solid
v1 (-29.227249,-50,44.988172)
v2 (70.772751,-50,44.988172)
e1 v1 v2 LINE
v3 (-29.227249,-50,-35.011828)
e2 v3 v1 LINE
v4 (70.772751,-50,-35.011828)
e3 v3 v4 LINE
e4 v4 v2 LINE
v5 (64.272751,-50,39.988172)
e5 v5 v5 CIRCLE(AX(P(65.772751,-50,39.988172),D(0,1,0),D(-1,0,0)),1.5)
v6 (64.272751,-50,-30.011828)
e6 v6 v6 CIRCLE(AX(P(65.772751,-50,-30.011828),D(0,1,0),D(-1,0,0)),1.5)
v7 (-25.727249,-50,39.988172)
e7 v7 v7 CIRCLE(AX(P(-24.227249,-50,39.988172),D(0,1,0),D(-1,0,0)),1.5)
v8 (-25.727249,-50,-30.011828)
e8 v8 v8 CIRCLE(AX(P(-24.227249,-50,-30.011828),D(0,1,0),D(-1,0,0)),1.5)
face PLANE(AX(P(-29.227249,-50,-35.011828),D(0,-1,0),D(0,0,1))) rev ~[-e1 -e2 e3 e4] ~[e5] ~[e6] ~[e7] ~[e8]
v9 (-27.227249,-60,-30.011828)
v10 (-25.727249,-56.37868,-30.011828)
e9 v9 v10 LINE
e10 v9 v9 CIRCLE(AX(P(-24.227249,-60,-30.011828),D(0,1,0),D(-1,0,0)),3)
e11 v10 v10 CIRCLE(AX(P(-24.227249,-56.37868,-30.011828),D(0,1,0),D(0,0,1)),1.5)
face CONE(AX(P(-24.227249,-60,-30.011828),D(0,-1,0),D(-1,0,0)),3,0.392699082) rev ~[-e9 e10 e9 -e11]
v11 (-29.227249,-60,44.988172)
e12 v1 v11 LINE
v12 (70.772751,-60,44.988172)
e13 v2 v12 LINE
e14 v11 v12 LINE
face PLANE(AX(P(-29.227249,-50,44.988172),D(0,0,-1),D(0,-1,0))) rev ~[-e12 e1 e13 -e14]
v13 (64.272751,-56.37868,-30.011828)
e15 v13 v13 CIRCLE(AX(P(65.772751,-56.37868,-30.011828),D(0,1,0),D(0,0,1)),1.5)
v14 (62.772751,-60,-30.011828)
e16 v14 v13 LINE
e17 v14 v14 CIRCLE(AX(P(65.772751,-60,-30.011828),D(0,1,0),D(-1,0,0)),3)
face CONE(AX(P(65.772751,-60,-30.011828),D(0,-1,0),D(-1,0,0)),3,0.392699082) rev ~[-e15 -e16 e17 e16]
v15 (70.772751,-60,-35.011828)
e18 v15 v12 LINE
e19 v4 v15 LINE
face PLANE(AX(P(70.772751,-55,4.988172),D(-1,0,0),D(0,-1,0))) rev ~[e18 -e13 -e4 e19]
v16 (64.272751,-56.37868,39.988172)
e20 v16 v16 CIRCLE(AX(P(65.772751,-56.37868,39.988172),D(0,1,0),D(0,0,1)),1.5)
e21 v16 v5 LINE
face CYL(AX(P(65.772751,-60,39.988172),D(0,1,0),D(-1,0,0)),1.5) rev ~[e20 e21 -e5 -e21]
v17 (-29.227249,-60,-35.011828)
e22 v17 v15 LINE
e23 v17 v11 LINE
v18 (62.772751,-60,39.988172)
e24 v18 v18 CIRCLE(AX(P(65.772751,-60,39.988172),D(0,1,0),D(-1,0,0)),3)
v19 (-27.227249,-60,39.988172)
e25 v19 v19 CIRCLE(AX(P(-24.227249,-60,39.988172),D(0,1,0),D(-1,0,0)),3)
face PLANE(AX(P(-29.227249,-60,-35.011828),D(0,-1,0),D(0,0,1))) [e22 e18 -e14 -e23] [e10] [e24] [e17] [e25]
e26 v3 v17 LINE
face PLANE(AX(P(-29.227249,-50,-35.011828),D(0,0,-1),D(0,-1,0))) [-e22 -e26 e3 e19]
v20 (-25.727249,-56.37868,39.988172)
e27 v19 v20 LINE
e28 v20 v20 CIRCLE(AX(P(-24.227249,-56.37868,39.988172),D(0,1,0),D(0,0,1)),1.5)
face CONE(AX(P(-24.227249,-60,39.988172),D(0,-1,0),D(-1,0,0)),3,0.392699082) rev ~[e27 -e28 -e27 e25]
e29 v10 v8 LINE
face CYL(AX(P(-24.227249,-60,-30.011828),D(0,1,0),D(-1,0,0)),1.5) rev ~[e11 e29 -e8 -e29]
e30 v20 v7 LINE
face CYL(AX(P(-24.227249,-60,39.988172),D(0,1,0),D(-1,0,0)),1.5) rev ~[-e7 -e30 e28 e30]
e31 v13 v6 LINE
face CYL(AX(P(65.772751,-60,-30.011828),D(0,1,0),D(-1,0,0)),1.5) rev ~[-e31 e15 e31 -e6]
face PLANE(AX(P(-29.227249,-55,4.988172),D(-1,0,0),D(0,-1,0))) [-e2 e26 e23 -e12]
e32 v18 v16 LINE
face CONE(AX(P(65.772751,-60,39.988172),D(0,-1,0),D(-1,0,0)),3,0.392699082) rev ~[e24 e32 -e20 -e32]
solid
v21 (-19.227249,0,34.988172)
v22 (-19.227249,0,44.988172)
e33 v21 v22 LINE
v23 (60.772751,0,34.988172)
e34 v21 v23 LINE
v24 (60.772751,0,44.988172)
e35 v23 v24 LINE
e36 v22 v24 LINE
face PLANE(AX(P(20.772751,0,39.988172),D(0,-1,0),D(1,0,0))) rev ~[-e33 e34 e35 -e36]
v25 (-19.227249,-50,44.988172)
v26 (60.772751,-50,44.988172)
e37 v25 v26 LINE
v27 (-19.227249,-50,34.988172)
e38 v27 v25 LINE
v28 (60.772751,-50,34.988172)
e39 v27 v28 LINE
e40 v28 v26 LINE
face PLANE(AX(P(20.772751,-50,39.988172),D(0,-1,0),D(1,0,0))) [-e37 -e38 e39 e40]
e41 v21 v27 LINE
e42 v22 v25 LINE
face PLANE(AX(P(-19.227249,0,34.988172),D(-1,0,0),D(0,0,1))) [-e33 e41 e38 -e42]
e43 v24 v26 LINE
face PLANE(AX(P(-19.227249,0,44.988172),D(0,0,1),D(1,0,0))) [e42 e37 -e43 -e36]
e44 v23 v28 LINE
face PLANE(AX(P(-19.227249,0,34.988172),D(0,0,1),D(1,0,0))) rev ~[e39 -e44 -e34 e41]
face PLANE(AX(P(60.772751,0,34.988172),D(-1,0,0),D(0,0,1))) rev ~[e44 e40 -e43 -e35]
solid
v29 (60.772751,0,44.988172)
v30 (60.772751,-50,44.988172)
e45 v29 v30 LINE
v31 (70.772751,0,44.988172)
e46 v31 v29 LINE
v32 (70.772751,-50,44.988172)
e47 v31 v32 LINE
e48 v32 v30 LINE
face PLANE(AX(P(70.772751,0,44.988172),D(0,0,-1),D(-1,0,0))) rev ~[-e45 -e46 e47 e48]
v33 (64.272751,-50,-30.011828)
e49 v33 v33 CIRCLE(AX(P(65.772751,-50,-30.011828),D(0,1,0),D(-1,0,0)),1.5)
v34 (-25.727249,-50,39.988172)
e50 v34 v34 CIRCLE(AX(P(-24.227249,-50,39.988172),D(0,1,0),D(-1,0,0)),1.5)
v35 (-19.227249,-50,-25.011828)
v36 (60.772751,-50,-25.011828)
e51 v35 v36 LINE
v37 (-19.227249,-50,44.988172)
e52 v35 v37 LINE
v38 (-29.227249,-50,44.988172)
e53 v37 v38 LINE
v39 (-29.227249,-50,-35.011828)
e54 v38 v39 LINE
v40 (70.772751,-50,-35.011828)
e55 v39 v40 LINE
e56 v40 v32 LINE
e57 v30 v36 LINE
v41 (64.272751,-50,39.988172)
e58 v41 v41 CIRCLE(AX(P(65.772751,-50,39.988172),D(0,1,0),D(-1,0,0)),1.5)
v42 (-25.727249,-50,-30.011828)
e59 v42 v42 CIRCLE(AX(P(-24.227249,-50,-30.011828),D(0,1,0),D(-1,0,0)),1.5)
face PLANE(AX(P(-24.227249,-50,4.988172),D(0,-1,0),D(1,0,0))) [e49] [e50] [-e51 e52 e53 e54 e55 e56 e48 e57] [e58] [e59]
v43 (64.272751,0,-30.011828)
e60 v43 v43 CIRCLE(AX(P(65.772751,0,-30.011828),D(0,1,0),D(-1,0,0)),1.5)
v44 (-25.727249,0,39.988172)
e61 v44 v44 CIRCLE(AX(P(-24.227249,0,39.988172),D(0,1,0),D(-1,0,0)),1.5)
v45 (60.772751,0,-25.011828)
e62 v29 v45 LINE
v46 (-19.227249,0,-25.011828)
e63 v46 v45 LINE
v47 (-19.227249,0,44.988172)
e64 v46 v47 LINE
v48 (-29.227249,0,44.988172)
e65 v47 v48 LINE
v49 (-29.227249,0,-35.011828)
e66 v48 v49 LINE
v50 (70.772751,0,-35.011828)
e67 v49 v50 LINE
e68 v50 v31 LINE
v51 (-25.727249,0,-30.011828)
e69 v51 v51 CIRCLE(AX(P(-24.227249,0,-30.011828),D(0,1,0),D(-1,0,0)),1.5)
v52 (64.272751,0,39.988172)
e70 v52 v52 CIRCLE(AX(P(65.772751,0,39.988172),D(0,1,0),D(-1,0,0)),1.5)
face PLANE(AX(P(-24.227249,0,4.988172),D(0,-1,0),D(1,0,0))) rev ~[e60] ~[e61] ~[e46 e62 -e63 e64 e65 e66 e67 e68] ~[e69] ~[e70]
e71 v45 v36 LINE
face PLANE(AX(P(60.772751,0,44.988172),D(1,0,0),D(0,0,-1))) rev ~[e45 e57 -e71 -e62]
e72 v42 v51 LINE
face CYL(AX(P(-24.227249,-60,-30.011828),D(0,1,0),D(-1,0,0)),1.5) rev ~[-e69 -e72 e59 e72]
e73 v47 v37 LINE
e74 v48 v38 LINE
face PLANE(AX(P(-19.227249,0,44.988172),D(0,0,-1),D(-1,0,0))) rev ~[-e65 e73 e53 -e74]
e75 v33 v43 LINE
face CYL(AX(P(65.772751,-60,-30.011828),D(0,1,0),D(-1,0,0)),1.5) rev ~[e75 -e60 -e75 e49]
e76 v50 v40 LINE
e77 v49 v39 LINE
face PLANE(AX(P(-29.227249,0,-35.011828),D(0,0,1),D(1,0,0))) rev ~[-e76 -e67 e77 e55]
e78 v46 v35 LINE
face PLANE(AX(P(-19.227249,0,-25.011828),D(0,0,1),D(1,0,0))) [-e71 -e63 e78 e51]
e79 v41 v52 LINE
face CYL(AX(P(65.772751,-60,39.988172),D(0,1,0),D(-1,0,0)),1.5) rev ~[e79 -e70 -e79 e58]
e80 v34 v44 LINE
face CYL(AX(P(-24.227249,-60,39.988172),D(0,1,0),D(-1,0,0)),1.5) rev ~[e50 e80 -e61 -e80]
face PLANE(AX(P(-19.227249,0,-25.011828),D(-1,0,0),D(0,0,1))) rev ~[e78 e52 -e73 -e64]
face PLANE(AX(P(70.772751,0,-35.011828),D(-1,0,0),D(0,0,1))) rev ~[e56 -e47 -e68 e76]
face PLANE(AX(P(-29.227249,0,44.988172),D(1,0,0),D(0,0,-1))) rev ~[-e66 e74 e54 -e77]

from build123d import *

# Parameters (mm, degrees)
F0_W             = 80
F0_H             = 10
F4_DEPTH         = 50
F2_W             = 80
F2_H             = 10
F5_W             = 10
F5_H             = 80
F6_DEPTH         = 100
F8_D             = 3
F8_CSINK_D       = 6
F8_CSINK_ANGLE   = 45
F8_2_D           = 3
F8_2_CSINK_D     = 6
F8_2_CSINK_ANGLE = 45


with BuildPart() as f4:
    # F0 (on Front) → F4 (new body)
    with BuildSketch(Plane.XZ):
        Polygon((-19.2272488975, 34.9881720543), (-19.2272488975, 44.9881720543), (-29.2272488975, 44.9881720543), (-29.2272488975, -35.0118279457), (-19.2272488975, -35.0118279457), (-19.2272488975, -25.0118279457), align=None)
        Polygon((70.7727511025, 44.9881720543), (60.7727511025, 44.9881720543), (60.7727511025, 34.9881720543), (60.7727511025, -25.0118279457), (60.7727511025, -35.0118279457), (70.7727511025, -35.0118279457), align=None)
        with Locations((20.7727511025, -30.0118279457)):
            Rectangle(F0_W, F0_H)
    extrude(amount=F4_DEPTH)

    # F8 (through all)
    with Locations(Plane.XZ.offset(60)):
        with Locations((-24.2272488975, 39.9881720543), (65.7727511025, 39.9881720543), (65.7727511025, -30.0118279457), (-24.2272488975, -30.0118279457)):
            CounterSinkHole(F8_D / 2, F8_CSINK_D / 2, counter_sink_angle=F8_CSINK_ANGLE)


with BuildPart() as f4b:
    # F2 (on face) → F4, piece 2 (new body)
    with BuildSketch(Plane.XZ):
        with Locations((20.7727511025, 39.9881720543)):
            Rectangle(F2_W, F2_H)
    extrude(amount=F4_DEPTH)


with BuildPart() as f6:
    # F5 (on face) → F6 (new body)
    with BuildSketch(Plane(origin=(-29.2272488975, 0, 0), x_dir=(0, -1, 0), z_dir=(-1, 0, 0))):
        with Locations((55, 4.9881720543)):
            Rectangle(F5_W, F5_H)
    extrude(amount=-F6_DEPTH)

    # F8#2 (through all)
    with Locations(Plane.XZ.offset(60)):
        with Locations((-24.2272488975, 39.9881720543), (65.7727511025, 39.9881720543), (65.7727511025, -30.0118279457), (-24.2272488975, -30.0118279457)):
            CounterSinkHole(F8_2_D / 2, F8_2_CSINK_D / 2, counter_sink_angle=F8_2_CSINK_ANGLE)


solid = Compound([f4.part, f4b.part, f6.part])
